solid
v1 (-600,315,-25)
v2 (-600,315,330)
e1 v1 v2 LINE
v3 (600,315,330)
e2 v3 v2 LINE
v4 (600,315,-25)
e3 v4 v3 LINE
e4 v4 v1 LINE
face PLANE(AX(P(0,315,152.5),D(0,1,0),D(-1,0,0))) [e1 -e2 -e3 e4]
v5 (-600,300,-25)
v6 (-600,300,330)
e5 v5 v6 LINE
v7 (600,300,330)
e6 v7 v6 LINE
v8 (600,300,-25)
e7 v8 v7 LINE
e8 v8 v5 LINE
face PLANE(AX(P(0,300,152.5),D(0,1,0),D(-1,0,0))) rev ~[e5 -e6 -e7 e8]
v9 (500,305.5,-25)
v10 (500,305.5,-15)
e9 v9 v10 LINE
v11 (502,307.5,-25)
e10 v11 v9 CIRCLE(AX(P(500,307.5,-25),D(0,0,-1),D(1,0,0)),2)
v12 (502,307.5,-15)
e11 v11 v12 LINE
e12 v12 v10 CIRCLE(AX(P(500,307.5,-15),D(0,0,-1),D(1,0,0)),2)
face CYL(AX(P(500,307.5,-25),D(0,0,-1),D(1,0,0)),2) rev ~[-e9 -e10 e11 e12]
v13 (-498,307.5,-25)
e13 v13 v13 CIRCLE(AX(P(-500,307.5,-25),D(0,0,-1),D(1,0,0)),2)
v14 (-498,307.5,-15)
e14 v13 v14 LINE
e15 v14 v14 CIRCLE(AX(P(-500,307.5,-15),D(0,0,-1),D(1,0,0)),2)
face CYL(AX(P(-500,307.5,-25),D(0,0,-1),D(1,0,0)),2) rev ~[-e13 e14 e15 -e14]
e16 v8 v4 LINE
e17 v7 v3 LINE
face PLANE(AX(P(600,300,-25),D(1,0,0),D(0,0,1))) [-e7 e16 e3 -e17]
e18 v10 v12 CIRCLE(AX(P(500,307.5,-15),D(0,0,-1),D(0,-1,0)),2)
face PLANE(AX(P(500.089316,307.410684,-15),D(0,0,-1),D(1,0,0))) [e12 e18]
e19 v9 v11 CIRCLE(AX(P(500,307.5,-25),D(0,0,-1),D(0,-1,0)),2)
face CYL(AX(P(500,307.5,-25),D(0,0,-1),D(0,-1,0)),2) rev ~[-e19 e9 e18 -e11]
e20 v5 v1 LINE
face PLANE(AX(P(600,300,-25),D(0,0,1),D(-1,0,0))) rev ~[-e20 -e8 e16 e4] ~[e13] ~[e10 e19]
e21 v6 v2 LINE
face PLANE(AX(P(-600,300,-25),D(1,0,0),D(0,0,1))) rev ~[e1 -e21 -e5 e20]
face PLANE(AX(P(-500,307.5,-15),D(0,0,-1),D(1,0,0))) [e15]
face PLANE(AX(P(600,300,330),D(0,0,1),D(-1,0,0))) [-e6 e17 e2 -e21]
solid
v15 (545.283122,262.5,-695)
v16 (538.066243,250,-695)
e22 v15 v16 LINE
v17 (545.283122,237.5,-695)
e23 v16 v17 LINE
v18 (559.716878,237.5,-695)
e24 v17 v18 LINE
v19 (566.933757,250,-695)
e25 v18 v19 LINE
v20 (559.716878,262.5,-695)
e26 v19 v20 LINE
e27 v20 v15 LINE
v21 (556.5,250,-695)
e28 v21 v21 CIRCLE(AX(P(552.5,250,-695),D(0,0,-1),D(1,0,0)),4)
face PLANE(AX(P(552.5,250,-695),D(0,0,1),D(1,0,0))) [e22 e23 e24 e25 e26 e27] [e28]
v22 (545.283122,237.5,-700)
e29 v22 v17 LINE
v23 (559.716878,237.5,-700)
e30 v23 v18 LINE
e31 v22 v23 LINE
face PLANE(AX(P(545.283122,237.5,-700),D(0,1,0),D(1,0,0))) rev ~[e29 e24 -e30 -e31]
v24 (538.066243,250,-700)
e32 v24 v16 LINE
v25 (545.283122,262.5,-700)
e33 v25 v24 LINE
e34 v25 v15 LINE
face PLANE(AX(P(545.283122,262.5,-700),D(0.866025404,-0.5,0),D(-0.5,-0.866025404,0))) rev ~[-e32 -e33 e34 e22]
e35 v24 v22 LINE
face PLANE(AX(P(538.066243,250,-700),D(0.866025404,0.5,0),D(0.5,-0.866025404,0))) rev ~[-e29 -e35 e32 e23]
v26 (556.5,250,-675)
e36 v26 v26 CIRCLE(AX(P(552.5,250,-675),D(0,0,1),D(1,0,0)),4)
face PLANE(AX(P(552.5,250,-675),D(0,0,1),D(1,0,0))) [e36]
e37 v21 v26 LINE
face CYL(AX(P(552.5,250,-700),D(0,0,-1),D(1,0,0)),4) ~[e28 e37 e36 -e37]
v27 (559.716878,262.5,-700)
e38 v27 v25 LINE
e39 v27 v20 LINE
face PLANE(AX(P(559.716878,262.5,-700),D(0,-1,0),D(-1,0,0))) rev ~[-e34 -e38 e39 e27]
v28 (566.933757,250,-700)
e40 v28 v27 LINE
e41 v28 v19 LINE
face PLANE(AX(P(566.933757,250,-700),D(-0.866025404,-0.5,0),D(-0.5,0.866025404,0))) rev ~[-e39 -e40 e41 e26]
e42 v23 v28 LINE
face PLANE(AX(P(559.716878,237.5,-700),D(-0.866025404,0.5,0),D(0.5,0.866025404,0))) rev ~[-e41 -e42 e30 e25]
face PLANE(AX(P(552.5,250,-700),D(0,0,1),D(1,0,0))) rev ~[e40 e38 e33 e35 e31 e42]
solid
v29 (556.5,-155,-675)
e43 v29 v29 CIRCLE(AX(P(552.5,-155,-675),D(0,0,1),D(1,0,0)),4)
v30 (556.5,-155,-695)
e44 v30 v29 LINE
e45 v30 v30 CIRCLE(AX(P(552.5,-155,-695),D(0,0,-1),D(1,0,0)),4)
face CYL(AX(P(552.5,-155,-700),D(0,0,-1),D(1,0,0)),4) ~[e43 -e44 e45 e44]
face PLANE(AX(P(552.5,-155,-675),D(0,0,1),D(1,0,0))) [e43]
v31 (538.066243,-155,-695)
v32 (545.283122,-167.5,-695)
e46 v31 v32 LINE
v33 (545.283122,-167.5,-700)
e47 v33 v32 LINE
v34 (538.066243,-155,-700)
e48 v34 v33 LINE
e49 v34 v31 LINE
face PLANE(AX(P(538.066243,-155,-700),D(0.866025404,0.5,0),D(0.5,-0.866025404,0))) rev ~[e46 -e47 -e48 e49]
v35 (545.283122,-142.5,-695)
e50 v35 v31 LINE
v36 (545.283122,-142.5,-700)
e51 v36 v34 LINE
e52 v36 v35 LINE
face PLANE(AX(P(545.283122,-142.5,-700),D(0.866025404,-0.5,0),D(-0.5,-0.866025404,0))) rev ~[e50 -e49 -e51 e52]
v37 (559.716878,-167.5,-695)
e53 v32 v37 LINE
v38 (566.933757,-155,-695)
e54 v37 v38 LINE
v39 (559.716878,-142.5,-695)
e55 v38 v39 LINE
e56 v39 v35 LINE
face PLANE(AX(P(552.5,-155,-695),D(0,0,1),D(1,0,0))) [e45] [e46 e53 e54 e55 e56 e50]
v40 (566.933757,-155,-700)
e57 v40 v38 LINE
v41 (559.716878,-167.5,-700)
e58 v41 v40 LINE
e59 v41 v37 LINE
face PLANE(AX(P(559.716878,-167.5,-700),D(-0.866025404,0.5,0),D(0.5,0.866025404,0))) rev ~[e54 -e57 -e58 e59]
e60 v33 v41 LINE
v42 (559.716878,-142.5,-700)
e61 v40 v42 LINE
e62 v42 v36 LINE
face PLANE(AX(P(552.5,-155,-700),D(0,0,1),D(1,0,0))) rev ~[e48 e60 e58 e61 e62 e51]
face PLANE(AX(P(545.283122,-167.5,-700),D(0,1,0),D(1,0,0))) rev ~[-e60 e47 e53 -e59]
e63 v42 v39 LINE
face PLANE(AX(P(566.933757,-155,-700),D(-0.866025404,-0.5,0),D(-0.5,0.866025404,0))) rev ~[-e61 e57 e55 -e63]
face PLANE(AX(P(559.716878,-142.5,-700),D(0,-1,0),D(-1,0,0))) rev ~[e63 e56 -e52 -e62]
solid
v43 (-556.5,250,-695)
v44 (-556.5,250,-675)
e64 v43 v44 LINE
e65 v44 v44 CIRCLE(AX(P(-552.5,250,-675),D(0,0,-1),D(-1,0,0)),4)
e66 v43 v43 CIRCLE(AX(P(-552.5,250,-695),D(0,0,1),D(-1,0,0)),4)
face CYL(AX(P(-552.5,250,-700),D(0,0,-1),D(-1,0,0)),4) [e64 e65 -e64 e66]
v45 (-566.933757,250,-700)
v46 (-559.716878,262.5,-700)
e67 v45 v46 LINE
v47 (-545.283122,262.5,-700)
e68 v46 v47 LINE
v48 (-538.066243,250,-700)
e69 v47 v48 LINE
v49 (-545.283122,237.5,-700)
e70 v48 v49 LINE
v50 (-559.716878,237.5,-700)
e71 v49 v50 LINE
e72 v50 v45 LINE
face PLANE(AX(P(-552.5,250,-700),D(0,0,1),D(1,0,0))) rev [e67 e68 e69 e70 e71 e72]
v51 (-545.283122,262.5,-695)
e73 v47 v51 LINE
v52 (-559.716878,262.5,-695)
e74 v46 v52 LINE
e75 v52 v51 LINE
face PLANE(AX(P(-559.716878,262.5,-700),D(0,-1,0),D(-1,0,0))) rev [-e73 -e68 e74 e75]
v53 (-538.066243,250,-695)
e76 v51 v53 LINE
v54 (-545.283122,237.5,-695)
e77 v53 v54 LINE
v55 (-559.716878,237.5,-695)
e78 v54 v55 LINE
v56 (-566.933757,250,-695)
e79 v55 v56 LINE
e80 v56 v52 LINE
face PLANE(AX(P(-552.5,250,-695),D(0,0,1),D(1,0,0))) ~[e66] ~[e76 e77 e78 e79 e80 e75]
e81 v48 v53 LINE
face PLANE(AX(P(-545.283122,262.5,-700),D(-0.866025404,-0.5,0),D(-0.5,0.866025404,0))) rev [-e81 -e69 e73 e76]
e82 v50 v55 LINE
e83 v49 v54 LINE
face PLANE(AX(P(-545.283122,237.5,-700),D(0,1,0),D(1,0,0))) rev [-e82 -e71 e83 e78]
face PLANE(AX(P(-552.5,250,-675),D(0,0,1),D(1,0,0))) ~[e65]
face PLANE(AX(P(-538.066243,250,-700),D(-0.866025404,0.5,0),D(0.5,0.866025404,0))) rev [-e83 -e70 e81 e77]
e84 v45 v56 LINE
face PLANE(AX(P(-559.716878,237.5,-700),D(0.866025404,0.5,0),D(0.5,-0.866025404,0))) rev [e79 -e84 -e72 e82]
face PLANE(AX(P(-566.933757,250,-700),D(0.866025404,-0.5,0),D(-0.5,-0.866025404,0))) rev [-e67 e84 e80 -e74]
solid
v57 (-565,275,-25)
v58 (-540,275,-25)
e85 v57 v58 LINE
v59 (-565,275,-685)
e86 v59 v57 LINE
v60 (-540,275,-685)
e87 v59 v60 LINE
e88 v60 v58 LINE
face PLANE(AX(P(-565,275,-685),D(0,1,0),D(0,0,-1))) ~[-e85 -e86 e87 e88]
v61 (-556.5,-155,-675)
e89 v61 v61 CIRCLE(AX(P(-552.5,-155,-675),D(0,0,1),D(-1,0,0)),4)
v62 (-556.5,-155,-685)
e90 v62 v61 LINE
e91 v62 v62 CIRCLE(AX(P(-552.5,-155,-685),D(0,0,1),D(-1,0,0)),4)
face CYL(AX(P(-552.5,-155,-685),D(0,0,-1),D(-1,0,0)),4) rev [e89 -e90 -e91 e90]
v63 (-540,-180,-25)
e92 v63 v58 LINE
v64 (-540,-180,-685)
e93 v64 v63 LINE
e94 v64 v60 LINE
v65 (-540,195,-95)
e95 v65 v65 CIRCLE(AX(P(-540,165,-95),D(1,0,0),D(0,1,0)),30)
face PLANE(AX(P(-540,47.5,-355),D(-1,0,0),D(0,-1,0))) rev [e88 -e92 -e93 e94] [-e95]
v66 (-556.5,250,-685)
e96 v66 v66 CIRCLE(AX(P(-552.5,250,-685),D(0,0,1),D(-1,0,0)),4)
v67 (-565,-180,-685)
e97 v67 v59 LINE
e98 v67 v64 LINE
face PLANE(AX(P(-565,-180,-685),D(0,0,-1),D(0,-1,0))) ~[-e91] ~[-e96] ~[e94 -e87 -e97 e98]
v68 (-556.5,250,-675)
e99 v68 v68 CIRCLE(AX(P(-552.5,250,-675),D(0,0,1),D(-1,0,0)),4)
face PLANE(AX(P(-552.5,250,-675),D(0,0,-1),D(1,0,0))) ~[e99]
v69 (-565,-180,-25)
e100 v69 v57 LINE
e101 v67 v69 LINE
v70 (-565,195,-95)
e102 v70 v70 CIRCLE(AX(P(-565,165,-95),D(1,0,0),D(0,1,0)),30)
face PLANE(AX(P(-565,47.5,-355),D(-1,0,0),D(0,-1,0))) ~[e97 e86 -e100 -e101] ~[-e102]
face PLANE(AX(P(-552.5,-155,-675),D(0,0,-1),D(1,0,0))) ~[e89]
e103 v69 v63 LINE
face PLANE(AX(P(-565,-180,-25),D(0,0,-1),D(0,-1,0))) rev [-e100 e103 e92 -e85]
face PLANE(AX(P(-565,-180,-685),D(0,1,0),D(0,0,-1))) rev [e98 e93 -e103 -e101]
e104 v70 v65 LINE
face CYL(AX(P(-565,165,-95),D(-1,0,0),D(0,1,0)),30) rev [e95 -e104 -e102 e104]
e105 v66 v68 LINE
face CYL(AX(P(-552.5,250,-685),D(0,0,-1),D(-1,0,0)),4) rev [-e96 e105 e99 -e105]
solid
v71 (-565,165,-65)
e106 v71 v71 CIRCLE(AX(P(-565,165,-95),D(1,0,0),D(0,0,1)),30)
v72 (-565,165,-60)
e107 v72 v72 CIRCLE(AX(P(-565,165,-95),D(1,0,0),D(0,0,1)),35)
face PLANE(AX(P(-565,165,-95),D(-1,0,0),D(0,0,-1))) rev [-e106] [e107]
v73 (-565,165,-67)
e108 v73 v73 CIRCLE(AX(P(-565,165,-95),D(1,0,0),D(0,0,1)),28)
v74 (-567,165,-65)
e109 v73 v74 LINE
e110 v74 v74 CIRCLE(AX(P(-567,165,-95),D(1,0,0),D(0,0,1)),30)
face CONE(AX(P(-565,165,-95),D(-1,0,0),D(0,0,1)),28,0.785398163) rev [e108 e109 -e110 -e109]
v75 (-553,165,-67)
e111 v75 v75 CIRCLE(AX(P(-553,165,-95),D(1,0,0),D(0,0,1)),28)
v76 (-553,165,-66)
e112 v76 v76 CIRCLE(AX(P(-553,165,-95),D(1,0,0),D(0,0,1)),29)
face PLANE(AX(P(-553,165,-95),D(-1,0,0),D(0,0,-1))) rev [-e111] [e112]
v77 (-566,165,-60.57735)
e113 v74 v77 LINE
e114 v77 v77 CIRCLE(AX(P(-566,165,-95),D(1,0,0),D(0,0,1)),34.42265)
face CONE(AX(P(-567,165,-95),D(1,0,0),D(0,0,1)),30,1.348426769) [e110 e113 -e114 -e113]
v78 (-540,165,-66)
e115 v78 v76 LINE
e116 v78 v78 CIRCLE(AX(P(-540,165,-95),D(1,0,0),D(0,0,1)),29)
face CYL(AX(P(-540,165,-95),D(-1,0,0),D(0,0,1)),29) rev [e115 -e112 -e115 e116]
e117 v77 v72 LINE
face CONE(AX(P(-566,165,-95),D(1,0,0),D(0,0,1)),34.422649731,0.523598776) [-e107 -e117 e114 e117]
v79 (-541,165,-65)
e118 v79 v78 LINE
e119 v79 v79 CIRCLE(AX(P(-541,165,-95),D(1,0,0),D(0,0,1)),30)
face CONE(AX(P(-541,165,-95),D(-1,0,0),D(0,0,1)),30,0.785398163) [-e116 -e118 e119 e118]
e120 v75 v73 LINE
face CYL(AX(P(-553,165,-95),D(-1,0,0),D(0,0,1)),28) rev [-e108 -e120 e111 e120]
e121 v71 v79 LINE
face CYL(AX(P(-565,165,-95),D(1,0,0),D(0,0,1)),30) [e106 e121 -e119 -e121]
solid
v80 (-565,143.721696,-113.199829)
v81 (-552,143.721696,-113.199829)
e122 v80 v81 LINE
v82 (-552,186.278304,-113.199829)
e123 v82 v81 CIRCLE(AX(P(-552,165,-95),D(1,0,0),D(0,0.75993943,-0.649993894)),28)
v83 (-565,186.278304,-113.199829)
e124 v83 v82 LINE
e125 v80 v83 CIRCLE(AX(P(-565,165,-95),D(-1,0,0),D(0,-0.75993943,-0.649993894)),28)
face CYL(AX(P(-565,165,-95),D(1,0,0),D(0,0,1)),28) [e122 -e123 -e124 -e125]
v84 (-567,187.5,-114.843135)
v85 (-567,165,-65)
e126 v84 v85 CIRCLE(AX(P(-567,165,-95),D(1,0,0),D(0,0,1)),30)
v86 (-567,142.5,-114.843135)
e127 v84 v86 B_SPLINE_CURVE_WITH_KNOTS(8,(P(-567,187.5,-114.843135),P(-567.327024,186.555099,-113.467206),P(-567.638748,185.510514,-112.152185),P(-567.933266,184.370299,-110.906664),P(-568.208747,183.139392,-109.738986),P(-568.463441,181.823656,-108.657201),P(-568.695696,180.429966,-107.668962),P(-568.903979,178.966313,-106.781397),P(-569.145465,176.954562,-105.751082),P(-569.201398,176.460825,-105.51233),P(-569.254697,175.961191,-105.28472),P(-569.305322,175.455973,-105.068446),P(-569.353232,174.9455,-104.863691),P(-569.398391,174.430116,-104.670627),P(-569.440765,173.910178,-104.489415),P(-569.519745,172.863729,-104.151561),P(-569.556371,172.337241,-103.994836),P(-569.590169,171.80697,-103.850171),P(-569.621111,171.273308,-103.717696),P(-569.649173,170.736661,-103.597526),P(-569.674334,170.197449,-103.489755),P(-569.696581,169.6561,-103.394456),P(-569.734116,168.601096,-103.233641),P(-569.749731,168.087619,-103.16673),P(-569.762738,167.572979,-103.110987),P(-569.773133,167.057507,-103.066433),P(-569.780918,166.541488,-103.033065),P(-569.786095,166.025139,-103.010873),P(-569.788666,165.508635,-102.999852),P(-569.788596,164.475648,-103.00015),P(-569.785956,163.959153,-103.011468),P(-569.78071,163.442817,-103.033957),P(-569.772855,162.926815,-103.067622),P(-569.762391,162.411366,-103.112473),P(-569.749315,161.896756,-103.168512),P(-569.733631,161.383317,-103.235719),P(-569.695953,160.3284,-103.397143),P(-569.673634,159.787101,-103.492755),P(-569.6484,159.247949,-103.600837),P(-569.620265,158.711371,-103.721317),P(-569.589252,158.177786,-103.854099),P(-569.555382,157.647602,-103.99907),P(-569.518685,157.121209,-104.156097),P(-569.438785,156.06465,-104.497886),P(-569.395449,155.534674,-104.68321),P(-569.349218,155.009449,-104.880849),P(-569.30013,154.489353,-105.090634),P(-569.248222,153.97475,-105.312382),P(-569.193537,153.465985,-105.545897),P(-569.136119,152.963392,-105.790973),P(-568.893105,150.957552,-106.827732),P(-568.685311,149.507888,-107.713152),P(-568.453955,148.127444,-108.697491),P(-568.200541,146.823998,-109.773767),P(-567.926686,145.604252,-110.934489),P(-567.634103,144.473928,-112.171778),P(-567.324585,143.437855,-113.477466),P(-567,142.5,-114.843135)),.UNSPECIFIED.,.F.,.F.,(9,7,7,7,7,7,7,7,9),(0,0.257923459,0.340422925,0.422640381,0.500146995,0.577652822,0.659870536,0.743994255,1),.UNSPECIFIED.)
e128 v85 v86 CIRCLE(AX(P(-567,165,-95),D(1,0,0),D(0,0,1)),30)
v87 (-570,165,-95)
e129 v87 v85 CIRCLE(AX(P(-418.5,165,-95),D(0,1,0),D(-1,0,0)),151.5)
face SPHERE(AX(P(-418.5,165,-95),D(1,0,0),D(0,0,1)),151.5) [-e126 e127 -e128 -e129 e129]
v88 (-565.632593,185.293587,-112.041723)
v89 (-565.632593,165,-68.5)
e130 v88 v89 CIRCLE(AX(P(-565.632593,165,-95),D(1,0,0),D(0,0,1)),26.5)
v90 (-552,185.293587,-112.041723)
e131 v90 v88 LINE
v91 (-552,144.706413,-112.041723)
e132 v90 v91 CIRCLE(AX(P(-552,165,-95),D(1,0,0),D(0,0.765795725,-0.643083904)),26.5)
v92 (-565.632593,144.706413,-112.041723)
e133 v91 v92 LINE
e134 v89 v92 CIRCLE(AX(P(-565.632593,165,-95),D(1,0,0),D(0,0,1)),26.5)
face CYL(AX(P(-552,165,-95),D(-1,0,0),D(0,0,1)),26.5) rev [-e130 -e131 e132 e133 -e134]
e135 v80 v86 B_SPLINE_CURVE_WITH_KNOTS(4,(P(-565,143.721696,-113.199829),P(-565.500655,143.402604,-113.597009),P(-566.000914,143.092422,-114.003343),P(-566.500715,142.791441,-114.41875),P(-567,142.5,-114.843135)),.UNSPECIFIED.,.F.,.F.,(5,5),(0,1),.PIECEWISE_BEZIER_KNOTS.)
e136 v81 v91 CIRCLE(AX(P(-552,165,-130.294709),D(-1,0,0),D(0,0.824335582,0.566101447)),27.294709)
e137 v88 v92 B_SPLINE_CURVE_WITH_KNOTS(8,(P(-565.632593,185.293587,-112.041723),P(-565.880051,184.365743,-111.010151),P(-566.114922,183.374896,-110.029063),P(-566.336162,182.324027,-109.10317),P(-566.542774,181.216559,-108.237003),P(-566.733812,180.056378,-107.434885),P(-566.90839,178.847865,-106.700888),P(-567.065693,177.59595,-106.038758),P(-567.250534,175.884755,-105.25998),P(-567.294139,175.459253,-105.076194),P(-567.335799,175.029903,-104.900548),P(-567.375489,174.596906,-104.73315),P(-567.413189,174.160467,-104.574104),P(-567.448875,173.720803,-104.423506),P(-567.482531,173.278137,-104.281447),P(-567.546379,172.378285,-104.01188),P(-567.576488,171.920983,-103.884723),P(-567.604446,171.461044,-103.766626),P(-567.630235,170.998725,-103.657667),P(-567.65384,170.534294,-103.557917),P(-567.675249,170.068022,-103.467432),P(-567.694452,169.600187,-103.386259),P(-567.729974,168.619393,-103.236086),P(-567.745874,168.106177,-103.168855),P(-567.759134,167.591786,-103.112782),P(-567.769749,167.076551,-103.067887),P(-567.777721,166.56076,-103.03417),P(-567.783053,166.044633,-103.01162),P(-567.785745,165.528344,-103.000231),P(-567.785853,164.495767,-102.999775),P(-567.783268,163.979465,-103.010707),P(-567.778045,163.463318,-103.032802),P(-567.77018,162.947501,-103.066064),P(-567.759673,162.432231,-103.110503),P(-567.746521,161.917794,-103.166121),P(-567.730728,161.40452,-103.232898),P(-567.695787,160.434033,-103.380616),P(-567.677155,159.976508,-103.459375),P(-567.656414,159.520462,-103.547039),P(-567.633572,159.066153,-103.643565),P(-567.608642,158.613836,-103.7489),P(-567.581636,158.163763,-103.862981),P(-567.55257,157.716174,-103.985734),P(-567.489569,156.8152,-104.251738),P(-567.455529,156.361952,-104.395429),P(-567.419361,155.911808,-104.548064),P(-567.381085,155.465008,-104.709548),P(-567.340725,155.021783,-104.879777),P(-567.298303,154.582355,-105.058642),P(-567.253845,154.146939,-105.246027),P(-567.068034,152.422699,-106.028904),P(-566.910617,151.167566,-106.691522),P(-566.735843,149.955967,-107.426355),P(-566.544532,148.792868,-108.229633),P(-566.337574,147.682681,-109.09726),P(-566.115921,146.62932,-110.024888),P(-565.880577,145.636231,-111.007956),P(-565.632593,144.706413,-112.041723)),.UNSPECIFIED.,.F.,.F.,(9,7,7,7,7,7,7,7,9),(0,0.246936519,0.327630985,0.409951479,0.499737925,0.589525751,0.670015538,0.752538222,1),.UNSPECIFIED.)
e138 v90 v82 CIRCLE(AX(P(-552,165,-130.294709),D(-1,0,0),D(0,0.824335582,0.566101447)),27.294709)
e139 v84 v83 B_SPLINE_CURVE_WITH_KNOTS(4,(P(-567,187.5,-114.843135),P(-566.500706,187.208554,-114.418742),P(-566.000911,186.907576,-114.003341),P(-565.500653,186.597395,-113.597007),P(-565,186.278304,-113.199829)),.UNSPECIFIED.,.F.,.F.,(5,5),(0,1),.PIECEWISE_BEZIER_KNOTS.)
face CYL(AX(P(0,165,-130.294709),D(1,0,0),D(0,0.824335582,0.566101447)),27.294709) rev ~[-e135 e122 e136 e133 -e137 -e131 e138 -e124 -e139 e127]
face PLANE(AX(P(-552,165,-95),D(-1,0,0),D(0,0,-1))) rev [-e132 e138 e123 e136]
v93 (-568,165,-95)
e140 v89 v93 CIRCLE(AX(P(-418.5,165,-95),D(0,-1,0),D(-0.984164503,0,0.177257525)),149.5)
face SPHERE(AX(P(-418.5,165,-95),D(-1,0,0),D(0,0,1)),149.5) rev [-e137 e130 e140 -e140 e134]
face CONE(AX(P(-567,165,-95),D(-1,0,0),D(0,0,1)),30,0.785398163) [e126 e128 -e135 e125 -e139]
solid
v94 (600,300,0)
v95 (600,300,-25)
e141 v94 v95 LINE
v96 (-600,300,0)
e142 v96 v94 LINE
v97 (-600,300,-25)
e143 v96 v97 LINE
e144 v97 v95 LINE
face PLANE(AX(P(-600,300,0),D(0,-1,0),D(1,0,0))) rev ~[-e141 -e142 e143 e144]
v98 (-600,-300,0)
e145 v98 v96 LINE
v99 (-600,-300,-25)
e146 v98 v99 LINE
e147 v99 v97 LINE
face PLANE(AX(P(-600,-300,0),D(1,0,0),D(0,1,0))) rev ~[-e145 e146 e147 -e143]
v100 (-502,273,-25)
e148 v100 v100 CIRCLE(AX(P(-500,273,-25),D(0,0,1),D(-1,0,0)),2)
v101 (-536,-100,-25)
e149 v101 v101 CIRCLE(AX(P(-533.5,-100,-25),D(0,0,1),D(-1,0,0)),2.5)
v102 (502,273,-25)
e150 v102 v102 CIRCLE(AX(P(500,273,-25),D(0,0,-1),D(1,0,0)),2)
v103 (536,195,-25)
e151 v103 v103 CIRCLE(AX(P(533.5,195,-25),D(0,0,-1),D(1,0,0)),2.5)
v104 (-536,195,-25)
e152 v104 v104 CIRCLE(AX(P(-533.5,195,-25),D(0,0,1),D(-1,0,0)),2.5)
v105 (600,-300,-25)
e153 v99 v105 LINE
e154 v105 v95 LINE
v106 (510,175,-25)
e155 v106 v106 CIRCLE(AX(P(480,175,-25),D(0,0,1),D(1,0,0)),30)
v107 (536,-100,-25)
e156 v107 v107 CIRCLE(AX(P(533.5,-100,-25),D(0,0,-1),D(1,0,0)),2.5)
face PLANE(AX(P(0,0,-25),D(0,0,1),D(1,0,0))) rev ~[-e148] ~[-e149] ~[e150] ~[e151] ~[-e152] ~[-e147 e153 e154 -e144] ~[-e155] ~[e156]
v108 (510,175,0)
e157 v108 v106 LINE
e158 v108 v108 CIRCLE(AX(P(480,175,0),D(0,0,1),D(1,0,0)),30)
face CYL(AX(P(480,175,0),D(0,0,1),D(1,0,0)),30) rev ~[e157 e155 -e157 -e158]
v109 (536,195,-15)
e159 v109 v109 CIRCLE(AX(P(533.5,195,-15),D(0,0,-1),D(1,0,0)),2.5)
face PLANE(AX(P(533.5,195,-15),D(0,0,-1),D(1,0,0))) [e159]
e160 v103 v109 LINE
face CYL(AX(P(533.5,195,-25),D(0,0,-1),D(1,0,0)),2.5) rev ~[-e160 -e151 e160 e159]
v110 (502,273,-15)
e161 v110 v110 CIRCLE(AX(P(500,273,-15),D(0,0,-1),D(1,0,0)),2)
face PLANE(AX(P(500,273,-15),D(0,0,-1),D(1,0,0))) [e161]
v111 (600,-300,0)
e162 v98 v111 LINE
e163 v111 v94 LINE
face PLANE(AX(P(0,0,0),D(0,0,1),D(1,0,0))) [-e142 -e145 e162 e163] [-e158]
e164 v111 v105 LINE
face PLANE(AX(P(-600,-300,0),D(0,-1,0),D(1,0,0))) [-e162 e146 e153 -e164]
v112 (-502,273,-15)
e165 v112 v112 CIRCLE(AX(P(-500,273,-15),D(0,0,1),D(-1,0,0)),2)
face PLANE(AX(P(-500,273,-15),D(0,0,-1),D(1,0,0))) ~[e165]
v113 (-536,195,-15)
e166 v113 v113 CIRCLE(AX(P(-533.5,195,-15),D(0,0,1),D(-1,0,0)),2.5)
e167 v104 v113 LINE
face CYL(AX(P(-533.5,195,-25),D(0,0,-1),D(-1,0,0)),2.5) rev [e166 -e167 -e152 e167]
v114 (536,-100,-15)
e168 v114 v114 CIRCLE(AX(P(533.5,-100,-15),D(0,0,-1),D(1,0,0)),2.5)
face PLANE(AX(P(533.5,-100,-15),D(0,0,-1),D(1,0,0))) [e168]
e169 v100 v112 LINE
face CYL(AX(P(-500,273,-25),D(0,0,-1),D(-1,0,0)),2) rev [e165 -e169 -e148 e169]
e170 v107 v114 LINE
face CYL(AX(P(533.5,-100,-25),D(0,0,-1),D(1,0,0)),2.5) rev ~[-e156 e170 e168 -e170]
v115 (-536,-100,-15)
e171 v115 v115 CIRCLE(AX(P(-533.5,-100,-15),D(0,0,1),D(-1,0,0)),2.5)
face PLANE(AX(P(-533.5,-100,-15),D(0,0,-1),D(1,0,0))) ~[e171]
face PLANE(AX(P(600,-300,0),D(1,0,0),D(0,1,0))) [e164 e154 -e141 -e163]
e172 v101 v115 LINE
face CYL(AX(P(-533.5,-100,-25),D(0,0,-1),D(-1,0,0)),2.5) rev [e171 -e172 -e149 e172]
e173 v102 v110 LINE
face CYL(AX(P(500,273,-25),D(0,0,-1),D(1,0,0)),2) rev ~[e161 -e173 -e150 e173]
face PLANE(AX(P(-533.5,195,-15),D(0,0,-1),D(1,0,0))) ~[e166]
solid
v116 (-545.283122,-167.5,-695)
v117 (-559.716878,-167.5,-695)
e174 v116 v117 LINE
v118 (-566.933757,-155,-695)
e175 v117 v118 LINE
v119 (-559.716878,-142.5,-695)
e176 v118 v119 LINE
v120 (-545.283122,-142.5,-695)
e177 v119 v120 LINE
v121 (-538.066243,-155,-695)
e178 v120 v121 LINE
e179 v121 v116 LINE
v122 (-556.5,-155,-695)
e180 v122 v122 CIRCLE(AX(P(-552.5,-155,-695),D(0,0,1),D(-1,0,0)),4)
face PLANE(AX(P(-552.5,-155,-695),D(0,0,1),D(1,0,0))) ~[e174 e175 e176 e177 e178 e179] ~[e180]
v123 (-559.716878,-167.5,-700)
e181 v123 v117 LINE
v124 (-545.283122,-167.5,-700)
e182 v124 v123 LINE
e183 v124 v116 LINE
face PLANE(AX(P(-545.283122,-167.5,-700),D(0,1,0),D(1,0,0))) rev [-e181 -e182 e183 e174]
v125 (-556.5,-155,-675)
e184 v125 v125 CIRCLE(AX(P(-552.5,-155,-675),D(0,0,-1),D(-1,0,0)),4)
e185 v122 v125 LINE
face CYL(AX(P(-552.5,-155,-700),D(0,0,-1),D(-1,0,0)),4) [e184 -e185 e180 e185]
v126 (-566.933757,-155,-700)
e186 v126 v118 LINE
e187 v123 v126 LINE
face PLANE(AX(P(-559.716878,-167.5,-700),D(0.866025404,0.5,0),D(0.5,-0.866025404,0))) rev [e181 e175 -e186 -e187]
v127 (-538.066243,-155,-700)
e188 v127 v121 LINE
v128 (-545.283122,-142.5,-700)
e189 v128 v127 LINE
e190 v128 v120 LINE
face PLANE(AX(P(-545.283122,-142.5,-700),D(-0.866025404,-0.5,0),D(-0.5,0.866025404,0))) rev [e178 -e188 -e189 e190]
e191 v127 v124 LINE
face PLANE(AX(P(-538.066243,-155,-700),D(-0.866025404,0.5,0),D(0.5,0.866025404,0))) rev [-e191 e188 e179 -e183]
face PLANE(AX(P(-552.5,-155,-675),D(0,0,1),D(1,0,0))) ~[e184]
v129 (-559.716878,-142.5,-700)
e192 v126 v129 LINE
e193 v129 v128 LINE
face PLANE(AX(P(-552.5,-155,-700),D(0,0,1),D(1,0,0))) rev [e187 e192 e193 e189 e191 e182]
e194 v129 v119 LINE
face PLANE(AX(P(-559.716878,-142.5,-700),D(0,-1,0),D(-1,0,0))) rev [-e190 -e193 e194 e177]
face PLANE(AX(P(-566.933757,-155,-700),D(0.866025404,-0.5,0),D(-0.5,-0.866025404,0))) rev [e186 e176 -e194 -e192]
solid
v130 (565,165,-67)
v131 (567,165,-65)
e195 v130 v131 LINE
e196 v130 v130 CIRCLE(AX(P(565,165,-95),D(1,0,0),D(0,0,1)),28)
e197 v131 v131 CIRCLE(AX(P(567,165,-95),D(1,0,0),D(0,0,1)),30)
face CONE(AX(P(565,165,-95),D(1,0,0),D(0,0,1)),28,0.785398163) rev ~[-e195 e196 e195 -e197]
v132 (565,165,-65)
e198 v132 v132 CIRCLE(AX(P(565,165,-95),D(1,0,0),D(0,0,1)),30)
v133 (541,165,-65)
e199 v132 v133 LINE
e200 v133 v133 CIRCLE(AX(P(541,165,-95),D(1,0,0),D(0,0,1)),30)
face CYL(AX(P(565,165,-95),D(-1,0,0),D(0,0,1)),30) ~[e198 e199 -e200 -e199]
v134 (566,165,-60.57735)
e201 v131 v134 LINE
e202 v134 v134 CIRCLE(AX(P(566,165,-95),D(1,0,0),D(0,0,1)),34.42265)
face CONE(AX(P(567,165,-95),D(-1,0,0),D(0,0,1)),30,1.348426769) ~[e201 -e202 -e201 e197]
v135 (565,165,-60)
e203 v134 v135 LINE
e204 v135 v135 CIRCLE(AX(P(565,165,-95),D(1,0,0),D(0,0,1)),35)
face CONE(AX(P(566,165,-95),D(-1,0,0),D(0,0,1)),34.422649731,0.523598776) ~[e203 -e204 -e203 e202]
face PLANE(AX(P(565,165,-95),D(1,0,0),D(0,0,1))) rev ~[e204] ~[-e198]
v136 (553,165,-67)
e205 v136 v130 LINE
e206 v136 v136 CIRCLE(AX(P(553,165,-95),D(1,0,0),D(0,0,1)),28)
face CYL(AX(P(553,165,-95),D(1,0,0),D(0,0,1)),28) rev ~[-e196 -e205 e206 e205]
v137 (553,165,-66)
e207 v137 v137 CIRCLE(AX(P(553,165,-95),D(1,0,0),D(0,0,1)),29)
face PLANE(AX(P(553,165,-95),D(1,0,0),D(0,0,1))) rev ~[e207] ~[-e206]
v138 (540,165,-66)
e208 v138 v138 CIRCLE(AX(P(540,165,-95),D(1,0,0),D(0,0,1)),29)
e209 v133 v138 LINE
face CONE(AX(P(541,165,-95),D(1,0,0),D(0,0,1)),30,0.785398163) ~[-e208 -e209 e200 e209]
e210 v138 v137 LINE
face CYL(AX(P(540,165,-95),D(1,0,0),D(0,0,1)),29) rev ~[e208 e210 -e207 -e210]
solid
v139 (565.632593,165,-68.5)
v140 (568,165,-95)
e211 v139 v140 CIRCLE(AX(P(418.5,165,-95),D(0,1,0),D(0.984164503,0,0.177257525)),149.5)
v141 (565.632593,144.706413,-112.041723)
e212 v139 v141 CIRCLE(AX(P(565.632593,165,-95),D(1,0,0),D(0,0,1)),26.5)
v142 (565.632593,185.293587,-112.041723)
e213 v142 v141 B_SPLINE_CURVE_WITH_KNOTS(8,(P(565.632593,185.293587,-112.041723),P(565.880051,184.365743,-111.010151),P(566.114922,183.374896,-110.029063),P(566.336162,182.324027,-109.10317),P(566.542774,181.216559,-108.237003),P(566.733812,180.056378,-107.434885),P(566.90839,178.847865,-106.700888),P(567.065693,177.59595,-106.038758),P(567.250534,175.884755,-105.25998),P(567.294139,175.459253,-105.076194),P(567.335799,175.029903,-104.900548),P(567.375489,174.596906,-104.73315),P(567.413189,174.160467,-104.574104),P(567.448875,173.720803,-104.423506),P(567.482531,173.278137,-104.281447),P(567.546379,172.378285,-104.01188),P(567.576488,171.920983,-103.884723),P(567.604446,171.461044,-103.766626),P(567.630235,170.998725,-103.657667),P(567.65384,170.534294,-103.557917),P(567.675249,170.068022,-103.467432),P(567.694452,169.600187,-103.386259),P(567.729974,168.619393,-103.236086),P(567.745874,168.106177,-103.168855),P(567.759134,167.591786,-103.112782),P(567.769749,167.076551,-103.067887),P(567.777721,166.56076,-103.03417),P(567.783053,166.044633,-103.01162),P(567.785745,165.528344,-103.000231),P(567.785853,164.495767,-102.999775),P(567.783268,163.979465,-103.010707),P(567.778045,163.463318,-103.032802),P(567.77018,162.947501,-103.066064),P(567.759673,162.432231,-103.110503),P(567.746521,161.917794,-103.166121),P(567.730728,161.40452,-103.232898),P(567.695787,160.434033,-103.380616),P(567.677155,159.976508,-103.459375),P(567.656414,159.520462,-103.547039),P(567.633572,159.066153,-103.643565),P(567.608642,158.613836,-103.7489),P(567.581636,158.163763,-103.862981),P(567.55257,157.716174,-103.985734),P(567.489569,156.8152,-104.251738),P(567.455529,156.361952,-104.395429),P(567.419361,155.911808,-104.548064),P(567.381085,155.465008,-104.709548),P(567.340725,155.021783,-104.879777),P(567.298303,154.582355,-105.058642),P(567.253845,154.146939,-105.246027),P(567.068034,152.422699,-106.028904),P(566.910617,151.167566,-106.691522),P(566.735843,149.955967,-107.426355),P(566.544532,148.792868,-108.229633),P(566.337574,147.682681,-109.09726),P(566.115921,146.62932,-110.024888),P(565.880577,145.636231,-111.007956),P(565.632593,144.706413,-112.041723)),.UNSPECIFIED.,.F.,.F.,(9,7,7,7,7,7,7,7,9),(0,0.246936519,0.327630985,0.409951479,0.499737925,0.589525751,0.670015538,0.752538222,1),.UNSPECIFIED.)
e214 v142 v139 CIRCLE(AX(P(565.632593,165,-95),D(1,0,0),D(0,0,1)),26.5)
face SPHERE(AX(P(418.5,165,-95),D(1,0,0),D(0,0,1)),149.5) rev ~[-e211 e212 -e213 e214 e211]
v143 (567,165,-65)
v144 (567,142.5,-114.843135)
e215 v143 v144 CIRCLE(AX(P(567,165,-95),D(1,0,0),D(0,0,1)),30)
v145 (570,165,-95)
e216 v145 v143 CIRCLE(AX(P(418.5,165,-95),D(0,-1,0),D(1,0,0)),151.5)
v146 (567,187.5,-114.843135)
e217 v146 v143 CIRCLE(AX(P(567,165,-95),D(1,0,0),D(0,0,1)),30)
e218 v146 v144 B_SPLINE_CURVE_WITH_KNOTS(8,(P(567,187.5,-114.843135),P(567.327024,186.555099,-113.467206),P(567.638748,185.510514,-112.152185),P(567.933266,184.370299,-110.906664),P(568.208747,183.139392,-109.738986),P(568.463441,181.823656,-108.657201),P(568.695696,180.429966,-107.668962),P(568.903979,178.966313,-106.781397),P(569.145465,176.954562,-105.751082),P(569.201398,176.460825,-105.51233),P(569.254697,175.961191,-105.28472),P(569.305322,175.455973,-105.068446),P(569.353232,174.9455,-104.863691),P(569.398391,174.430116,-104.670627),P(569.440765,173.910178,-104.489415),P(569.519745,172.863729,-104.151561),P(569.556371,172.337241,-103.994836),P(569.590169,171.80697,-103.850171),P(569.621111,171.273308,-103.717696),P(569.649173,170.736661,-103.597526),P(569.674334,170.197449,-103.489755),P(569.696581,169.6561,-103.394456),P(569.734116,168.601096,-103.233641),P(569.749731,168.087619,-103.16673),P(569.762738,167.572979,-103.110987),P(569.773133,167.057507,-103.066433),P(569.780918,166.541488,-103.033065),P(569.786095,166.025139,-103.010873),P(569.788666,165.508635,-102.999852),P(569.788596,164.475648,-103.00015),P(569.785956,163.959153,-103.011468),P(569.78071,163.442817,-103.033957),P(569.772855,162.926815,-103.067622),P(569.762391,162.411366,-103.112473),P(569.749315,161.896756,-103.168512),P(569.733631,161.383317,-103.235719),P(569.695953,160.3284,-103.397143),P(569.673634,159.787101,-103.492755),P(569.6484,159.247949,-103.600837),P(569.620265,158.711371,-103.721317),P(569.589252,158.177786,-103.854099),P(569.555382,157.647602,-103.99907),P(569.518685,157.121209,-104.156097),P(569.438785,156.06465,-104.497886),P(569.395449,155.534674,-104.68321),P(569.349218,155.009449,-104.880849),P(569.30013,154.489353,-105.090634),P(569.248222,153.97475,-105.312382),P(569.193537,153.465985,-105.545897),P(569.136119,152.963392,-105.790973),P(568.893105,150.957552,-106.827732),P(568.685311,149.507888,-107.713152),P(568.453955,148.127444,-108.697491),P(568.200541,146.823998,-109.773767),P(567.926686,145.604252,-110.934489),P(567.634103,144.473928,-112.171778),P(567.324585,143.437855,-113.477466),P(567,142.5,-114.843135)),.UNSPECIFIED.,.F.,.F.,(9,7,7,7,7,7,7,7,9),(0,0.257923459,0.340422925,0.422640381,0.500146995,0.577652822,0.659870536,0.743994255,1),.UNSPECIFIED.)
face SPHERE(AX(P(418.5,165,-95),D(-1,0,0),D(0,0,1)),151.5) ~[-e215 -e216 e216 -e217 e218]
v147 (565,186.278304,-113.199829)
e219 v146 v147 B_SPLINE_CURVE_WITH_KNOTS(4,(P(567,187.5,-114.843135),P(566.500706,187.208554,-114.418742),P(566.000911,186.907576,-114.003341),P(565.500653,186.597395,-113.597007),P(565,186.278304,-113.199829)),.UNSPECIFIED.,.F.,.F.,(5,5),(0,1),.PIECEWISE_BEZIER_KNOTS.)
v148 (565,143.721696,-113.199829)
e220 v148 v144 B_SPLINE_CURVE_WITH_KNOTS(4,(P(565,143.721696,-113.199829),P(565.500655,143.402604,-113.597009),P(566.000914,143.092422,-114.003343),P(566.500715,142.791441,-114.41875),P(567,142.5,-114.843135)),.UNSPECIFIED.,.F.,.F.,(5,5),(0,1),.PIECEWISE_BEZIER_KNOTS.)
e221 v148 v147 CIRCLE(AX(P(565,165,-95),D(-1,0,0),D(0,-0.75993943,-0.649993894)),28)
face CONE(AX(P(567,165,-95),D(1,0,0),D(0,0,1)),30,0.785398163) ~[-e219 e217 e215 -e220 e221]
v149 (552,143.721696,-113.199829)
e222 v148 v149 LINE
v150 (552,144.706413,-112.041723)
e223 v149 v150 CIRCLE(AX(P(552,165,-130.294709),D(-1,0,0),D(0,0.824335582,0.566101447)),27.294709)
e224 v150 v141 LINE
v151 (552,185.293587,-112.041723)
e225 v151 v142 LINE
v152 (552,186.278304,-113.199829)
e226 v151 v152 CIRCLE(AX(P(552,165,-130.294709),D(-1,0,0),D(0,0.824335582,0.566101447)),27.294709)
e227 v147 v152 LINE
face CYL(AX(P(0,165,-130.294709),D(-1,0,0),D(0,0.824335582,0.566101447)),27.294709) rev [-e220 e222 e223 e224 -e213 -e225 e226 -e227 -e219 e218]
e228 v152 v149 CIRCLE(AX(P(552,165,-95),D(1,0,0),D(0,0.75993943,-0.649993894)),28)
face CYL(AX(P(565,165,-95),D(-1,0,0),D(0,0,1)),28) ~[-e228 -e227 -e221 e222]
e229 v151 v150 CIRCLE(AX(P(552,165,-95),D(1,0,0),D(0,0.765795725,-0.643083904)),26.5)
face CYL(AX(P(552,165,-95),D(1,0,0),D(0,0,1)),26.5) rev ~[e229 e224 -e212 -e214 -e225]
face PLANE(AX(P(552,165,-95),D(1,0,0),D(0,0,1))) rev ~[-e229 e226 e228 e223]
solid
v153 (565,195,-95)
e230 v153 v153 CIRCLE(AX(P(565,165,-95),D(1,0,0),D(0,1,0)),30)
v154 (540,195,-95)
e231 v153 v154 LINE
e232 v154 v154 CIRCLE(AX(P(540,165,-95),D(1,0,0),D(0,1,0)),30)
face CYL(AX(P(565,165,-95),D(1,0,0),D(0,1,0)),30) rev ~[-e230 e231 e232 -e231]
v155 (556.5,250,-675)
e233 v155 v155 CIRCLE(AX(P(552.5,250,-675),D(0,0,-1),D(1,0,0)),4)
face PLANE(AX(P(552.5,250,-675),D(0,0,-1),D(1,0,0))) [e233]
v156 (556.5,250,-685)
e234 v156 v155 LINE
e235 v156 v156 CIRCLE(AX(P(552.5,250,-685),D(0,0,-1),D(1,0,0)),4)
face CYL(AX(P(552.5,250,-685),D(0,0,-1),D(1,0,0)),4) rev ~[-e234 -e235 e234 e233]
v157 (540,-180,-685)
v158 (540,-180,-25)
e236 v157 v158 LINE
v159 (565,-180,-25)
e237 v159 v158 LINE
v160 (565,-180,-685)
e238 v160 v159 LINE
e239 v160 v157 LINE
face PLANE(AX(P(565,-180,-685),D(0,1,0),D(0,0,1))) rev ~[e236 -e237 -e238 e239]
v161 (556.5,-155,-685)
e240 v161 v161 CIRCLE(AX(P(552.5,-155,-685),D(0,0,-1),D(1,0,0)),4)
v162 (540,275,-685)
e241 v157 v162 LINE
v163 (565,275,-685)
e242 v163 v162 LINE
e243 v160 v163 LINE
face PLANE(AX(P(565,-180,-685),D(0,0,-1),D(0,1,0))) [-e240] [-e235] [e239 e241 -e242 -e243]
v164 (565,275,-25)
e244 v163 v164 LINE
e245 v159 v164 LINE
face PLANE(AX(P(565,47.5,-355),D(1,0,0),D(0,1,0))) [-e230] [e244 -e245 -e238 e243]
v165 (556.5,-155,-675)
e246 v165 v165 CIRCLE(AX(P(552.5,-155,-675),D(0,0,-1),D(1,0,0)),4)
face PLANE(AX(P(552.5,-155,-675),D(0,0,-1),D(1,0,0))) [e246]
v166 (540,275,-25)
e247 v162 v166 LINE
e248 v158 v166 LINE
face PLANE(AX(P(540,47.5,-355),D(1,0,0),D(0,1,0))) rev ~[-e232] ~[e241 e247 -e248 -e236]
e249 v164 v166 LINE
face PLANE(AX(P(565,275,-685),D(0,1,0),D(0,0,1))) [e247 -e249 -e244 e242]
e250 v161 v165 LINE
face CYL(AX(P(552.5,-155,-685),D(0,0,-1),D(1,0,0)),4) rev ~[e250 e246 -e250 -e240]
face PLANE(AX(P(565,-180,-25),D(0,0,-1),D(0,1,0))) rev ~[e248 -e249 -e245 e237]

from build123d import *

# Parameters (mm, degrees)
F2_W      = 1200
F2_H      = 600
F2_R      = 30
F3_DEPTH  = 25
F5_W      = 455
F5_H      = 660
F5_R      = 30
F7_DEPTH  = 25
F13_DEPTH = 600.001
F14_R     = 2.5
F14_R_2   = 2
F15_DEPTH = 10
F16_R     = 4
F17_DEPTH = 10
F18_R     = 4
F19_DEPTH = 5
F20_DEPTH = 25
F22_W     = 1200
F22_H     = 355
F23_DEPTH = 15
F24_R     = 2
F25_DEPTH = 10


# Not quite as in the source:
# - a pattern or mirror of a feature is missing from the dataset's text; its kind, count and spacing are read off the source's solid


with BuildPart() as f3:
    # F2 (on Top) → F3 (new body)
    with BuildSketch(Plane.XY):
        Rectangle(F2_W, F2_H)
        with Locations((480, 175)):
            Circle(F2_R, mode=Mode.SUBTRACT)
    extrude(amount=-F3_DEPTH)

    # F14 (on face) → F15 (cut)
    with BuildSketch(Plane(origin=(0, 0, -25), x_dir=(1, 0, 0), z_dir=(0, 0, -1))):
        with Locations((533.5, 100)):
            Circle(F14_R)
        with Locations((533.5, -195)):
            Circle(F14_R)
        with Locations((500, -273)):
            Circle(F14_R_2)
    f15 = extrude(amount=-F15_DEPTH, mode=Mode.SUBTRACT)

    # F15_copies: F15 across plane
    add(f15.mirror(Plane(origin=(0, 0, 0), x_dir=(0, 0, -1), z_dir=(-1, 0, 0))), mode=Mode.SUBTRACT)


with BuildPart() as f7:
    # F5 (on offset) → F7 (new body)
    with BuildSketch(Plane.YZ.offset(565)):
        with Locations((47.5, -355)):
            Rectangle(F5_W, F5_H)
        with Locations((165, -95)):
            Circle(F5_R, mode=Mode.SUBTRACT)
    extrude(amount=-F7_DEPTH)

    # F16 (on face) → F17 (cut)
    with BuildSketch(Plane(origin=(0, 0, -685), x_dir=(1, 0, 0), z_dir=(0, 0, -1))):
        with Locations((552.5, 155)):
            Circle(F16_R)
        with Locations((552.5, -250)):
            Circle(F16_R)
    extrude(amount=-F17_DEPTH, mode=Mode.SUBTRACT)


with BuildPart() as f10:
    # F9 (on plane+point) → F10 (revolve)
    with BuildSketch(Plane.XZ.offset(-165)):
        Polygon((565, -65), (541, -65), (540, -66), (553, -66), (553, -67), (565, -67), (567, -65), (566, -60.5773502692), (565, -60), align=None)
    revolve(axis=Axis((547.4527119644, 165, -95), (1, 0, 0)))


with BuildPart() as f11:
    # F9 (on plane+point) → F11 (revolve)
    with BuildSketch(Plane.XZ.offset(-165)):
        with BuildLine():
            Line((565, -67), (553, -67))
            Line((553, -67), (552, -67))
            Line((552, -67), (552, -68.5))
            Line((552, -68.5), (565.632593262, -68.5))
            ThreePointArc((565.632593262, -68.5), (567.4069721213, -81.6972313534), (568, -95))
            Line((568, -95), (570, -95))
            ThreePointArc((570, -95), (569.2481343168, -79.9251865683), (567, -65))
            Line((567, -65), (565, -67))
        make_face()
    revolve(axis=Axis((547.4527119644, 165, -95), (1, 0, 0)))

    # F12 (on Right) → F13 (cut, through all)
    with BuildSketch(Plane.YZ):
        with BuildLine():
            ThreePointArc((142.5, -114.843134833), (165, -125), (187.5, -114.843134833))
            ThreePointArc((187.5, -114.843134833), (165, -103), (142.5, -114.843134833))
        make_face()
    extrude(amount=F13_DEPTH, mode=Mode.SUBTRACT)


with BuildPart() as f19:
    # F18 (on plane+point) → F19 (new body)
    with BuildSketch(Plane.XY.offset(-700)):
        Polygon((566.9337567297, -155), (559.7168783649, -142.5), (545.2831216351, -142.5), (538.0662432703, -155), (545.2831216351, -167.5), (559.7168783649, -167.5), align=None)
        with Locations((552.5, -155)):
            Circle(F18_R, mode=Mode.SUBTRACT)
        with Locations((552.5, -155)):
            Circle(F18_R)
    extrude(amount=F19_DEPTH)

    # F18 (on plane+point) → F20, piece 2 (join)
    with BuildSketch(Plane.XY.offset(-700)):
        with Locations((552.5, -155)):
            Circle(F18_R)
    extrude(amount=F20_DEPTH)


with BuildPart() as f19b:
    # F18 (on plane+point) → F19, piece 2 (new body)
    with BuildSketch(Plane.XY.offset(-700)):
        Polygon((566.9337567297, 250), (559.7168783649, 262.5), (545.2831216351, 262.5), (538.0662432703, 250), (545.2831216351, 237.5), (559.7168783649, 237.5), align=None)
        with Locations((552.5, 250)):
            Circle(F18_R, mode=Mode.SUBTRACT)
        with Locations((552.5, 250)):
            Circle(F18_R)
    extrude(amount=F19_DEPTH)

    # F18 (on plane+point) → F20 (join)
    with BuildSketch(Plane.XY.offset(-700)):
        with Locations((552.5, 250)):
            Circle(F18_R)
    extrude(amount=F20_DEPTH)


with BuildPart() as f21_1:
    # F21: instance of F10
    add(f10.part.mirror(Plane.YZ))


with BuildPart() as f21_2:
    # F21: instance of F7
    add(f7.part.mirror(Plane.YZ))


with BuildPart() as f21_3:
    # F21: instance of F11
    add(f11.part.mirror(Plane.YZ))


with BuildPart() as f21_4:
    # F21: instance of F19b
    add(f19b.part.mirror(Plane.YZ))


with BuildPart() as f21_5:
    # F21: instance of F19
    add(f19.part.mirror(Plane.YZ))


with BuildPart() as f23:
    # F22 (on face) → F23 (new body)
    with BuildSketch(Plane(origin=(0, 300, 0), x_dir=(-1, 0, 0), z_dir=(0, 1, 0))):
        with Locations((0, 152.5)):
            Rectangle(F22_W, F22_H)
    extrude(amount=F23_DEPTH)

    # F24 (on face) → F25 (cut)
    with BuildSketch(Plane(origin=(0, 0, -25), x_dir=(1, 0, 0), z_dir=(0, 0, -1))):
        with Locations((-500, -307.5)):
            Circle(F24_R)
        with BuildLine():
            ThreePointArc((500, -305.5), (498.5857864376, -308.9142135624), (502, -307.5))
            ThreePointArc((502, -307.5), (501.4142135624, -306.0857864376), (500, -305.5))
        make_face()
    extrude(amount=-F25_DEPTH, mode=Mode.SUBTRACT)


solid = Compound([f3.part, f7.part, f10.part, f11.part, f19.part, f19b.part, f21_1.part, f21_2.part, f21_3.part, f21_4.part, f21_5.part, f23.part])
